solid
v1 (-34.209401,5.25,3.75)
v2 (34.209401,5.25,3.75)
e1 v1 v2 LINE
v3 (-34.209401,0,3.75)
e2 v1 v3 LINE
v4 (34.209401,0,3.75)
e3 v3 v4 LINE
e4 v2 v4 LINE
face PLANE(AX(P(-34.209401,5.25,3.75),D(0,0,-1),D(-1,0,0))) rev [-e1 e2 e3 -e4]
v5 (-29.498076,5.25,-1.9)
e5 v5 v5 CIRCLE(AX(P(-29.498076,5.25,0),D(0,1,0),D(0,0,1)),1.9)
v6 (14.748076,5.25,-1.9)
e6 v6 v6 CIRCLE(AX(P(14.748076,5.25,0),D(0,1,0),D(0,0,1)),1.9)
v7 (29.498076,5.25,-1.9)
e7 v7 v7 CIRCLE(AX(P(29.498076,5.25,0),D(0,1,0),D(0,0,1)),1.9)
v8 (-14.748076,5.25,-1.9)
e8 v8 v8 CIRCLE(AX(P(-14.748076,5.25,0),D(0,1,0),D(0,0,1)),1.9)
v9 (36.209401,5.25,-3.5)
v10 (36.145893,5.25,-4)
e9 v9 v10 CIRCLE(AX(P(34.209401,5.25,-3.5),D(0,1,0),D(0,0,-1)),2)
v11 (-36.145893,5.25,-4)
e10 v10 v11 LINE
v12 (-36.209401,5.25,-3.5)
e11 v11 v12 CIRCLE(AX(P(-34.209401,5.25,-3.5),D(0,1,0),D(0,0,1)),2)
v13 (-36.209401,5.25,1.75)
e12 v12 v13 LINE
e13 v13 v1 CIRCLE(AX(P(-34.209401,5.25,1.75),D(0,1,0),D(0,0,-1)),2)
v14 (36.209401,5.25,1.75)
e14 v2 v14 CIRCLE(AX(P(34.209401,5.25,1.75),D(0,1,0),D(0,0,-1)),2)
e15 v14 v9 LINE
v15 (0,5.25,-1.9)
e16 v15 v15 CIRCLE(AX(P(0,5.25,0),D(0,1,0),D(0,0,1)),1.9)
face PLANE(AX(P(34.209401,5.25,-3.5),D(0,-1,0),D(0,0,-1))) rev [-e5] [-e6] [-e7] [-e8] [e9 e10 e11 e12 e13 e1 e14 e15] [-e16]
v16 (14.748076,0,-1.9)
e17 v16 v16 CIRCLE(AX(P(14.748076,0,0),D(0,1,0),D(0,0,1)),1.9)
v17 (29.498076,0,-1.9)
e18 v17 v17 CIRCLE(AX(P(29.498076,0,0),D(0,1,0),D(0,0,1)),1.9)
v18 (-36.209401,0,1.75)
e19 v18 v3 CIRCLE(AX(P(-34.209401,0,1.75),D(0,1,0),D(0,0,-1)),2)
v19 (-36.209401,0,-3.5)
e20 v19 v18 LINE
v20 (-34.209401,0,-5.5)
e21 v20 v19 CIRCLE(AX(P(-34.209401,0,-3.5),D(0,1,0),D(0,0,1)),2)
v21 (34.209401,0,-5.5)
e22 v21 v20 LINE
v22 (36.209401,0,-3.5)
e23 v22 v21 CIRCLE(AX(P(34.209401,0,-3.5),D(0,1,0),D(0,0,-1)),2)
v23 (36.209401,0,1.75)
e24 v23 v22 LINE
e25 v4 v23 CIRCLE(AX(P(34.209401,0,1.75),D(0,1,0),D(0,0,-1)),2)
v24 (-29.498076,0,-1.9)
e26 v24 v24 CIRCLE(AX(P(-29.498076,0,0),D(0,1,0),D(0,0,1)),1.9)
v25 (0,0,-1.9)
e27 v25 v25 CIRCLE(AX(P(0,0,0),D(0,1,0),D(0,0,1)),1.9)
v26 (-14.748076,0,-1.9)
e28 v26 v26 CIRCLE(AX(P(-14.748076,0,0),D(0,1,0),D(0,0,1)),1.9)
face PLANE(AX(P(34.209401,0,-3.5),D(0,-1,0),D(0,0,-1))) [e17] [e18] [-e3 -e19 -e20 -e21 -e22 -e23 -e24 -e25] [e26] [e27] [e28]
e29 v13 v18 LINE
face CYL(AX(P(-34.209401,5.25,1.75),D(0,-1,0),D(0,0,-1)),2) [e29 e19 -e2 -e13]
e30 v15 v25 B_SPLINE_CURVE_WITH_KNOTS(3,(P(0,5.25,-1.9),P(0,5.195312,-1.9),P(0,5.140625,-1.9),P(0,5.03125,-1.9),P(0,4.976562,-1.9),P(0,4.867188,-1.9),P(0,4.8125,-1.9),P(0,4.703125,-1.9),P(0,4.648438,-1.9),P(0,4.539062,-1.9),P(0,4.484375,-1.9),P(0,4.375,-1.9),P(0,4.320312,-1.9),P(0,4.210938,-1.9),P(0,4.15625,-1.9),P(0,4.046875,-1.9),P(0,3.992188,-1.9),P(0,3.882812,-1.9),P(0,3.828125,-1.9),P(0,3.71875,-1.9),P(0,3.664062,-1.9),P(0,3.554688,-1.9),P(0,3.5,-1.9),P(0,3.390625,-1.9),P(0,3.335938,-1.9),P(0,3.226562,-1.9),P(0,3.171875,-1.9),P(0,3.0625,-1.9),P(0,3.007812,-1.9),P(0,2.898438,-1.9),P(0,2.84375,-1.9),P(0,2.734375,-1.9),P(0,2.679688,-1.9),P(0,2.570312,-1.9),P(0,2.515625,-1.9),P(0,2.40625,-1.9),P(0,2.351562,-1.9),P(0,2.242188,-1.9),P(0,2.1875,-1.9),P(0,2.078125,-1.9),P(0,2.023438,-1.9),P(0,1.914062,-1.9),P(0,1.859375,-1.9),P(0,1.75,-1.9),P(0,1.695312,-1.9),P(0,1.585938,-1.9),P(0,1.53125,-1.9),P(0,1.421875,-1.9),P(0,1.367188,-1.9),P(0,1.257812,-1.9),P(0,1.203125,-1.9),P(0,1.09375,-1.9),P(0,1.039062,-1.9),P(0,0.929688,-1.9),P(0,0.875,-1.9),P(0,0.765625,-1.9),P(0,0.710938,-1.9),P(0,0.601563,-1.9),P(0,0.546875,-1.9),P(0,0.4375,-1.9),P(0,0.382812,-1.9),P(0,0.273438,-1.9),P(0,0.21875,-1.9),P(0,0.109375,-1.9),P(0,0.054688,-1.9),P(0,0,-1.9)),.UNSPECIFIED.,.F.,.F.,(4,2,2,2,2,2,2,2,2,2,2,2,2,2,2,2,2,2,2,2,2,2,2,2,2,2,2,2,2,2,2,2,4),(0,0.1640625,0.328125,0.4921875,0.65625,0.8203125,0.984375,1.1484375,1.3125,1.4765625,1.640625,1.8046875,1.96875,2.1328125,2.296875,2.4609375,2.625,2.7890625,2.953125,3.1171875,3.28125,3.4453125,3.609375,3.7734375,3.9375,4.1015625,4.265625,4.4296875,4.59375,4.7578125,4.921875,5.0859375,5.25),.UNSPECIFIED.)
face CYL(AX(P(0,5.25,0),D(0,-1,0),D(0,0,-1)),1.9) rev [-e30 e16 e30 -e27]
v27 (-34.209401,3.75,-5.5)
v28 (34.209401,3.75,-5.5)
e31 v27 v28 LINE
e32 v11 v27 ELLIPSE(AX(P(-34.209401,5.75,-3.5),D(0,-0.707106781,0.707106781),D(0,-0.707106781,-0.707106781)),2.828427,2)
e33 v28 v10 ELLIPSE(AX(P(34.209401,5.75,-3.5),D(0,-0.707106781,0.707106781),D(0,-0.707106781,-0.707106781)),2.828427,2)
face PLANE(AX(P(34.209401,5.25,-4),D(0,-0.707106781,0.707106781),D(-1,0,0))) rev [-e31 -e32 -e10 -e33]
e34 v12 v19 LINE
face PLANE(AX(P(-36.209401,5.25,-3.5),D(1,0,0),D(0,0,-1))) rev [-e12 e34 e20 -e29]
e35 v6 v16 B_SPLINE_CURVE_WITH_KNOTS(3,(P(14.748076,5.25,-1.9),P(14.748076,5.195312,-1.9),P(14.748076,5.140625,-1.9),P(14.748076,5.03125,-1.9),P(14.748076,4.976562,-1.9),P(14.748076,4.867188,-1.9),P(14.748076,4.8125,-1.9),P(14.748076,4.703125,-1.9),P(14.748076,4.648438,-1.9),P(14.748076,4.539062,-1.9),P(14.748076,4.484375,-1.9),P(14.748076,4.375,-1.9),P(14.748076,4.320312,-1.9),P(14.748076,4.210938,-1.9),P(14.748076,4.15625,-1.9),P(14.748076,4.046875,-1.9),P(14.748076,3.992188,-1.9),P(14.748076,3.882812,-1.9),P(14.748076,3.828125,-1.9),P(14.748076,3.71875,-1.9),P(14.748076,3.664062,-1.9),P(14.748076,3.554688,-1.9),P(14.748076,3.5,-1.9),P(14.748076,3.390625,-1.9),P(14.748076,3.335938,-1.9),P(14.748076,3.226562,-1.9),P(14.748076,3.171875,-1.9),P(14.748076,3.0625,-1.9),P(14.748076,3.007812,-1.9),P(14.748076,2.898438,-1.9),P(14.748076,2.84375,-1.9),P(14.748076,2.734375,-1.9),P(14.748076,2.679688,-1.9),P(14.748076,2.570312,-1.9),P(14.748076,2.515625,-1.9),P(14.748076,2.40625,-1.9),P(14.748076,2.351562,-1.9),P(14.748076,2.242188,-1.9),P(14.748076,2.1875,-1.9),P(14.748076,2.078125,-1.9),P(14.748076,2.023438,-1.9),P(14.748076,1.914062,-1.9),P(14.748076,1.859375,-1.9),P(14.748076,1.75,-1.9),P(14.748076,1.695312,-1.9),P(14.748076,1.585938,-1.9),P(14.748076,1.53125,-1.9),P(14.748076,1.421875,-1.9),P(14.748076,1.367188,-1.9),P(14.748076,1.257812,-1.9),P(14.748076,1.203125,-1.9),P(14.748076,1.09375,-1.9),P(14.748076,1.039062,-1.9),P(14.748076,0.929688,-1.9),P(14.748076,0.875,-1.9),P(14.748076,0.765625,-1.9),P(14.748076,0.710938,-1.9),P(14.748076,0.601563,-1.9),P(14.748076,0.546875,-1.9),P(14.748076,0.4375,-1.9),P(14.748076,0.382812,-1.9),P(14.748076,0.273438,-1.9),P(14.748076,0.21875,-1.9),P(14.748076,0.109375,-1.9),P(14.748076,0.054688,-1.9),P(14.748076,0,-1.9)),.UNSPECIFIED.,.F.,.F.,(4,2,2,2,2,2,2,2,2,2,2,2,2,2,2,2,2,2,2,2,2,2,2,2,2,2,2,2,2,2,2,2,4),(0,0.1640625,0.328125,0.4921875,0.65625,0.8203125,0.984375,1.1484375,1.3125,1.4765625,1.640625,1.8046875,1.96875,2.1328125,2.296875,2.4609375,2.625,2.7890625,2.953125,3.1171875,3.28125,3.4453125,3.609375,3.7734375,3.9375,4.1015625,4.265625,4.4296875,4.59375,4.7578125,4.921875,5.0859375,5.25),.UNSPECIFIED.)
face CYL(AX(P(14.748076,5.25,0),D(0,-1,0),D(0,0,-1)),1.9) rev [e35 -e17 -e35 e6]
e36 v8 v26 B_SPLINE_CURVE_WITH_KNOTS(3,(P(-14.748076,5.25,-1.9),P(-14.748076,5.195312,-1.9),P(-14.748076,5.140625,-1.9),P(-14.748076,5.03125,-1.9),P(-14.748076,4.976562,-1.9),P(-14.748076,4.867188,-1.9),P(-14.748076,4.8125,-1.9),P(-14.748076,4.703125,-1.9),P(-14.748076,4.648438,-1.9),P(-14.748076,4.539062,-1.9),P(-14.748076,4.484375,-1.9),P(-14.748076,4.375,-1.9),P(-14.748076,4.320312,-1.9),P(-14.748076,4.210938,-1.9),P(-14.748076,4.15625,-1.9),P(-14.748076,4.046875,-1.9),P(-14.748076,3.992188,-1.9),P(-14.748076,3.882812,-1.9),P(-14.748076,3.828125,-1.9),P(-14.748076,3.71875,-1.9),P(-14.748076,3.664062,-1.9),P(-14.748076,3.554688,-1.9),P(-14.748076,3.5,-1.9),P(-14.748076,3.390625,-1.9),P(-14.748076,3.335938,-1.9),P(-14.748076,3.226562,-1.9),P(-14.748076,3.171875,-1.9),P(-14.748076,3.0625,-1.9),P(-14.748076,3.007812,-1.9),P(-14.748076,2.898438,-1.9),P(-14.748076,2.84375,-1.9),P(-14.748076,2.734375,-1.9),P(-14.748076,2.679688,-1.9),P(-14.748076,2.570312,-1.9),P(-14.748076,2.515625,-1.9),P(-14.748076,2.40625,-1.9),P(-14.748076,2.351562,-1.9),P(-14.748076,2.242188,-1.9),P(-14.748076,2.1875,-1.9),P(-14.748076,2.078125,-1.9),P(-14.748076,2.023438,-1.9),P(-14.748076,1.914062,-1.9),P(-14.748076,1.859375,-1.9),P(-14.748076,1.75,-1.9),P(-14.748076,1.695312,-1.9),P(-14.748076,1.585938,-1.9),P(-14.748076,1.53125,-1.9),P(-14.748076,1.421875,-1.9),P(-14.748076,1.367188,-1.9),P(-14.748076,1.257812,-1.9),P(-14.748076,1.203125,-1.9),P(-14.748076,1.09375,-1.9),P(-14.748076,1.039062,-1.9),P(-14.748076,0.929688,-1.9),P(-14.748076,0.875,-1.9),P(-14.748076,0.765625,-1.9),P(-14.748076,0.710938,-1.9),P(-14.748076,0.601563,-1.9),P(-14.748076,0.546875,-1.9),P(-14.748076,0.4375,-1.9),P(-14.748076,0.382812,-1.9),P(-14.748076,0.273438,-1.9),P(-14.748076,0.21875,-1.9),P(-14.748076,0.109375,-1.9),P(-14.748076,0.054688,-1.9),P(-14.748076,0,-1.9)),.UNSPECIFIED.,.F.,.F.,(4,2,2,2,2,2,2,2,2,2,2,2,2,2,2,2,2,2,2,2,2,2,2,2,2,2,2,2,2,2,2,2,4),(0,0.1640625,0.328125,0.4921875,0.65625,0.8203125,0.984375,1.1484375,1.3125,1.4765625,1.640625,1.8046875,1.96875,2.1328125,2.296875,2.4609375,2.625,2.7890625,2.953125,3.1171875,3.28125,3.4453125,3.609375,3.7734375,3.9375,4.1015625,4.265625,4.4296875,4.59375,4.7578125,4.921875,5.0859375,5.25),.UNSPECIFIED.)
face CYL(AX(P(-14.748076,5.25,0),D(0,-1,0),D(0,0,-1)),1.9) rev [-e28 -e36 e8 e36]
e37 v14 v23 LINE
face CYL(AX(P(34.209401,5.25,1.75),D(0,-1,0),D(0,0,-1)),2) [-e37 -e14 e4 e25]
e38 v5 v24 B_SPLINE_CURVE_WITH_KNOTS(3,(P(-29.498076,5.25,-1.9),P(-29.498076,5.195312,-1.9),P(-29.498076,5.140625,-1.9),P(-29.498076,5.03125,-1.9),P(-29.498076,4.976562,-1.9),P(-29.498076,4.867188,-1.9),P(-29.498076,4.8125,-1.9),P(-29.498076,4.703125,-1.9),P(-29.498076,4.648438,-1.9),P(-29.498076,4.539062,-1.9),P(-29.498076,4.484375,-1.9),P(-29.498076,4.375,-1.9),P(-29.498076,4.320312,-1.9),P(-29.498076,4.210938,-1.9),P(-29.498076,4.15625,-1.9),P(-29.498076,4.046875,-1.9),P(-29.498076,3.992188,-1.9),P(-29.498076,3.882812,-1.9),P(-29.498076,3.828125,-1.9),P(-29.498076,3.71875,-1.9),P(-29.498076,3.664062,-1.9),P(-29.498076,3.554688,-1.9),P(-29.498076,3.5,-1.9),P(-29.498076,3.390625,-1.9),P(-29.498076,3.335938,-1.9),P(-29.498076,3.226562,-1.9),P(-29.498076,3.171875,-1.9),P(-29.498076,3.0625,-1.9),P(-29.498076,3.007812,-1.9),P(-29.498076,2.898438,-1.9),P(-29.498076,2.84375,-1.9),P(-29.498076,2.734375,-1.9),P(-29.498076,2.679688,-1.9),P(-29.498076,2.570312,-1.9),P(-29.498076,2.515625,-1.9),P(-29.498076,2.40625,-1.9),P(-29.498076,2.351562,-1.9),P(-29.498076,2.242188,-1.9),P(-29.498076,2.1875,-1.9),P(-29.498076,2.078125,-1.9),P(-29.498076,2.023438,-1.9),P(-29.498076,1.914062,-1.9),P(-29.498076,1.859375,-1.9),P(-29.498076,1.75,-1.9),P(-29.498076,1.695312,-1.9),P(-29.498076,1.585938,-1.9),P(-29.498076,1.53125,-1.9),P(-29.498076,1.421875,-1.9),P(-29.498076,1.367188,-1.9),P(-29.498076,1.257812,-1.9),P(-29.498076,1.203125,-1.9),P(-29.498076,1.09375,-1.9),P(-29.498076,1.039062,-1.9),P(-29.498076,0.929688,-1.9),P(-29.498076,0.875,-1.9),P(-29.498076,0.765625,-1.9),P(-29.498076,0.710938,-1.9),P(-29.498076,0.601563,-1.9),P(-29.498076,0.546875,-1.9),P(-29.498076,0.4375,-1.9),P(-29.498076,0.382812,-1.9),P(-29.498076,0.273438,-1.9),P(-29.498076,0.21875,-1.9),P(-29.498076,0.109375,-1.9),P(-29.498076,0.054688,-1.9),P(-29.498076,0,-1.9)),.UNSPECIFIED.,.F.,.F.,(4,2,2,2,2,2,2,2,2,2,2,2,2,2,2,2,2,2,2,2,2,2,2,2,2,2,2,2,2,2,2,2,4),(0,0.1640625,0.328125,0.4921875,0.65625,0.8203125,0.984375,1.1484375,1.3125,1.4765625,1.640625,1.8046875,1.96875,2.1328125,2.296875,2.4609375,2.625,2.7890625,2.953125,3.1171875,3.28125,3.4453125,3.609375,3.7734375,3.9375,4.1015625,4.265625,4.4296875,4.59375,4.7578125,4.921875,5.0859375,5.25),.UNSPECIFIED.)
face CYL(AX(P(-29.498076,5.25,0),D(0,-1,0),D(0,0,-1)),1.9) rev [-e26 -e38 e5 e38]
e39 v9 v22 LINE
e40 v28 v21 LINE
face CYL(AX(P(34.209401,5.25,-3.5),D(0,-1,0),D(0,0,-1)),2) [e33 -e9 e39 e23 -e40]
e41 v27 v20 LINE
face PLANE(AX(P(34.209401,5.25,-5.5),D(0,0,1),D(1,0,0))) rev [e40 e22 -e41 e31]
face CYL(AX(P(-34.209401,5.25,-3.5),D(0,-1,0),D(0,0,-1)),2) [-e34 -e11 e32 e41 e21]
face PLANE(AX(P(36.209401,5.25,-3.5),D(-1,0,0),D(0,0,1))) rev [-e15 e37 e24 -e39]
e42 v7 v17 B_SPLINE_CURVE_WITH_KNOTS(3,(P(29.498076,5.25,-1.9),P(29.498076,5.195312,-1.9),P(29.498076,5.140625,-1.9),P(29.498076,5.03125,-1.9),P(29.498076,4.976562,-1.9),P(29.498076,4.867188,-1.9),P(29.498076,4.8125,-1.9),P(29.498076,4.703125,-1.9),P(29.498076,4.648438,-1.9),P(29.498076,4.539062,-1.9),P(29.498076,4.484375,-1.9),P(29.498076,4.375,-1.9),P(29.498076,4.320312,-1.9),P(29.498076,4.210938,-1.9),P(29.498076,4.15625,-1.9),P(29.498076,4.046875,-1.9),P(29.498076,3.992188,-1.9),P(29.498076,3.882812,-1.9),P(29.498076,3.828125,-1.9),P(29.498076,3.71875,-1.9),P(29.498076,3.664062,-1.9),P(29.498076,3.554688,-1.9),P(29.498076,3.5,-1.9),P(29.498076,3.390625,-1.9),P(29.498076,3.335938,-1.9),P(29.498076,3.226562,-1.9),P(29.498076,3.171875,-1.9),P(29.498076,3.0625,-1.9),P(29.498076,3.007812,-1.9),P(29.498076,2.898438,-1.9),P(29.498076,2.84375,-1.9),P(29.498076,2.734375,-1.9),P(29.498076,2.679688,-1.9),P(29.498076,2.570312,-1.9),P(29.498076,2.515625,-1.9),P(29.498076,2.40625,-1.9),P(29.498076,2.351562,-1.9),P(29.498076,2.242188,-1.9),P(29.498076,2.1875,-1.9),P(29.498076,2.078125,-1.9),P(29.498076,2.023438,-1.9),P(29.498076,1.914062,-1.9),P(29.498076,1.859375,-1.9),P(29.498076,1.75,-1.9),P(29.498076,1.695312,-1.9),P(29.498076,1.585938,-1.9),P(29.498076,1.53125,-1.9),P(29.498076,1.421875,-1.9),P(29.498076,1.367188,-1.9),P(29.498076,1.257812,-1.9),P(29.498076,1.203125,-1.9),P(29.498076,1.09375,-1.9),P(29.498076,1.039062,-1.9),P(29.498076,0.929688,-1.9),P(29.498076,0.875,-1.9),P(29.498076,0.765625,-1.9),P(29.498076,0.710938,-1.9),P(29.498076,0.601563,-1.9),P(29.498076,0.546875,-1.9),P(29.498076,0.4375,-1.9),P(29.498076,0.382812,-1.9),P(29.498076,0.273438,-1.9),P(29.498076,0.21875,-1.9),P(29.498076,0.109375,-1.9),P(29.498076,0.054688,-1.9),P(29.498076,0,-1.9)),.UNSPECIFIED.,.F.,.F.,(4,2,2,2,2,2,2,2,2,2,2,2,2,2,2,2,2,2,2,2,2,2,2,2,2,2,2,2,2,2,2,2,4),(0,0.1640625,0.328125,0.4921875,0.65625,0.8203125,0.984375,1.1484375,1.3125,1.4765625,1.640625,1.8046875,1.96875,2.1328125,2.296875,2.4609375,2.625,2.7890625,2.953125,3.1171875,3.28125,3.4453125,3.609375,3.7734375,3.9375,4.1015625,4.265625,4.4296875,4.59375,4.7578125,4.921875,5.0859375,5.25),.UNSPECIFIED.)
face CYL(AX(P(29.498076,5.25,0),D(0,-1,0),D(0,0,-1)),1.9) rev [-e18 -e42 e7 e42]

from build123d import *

# Parameters (mm, degrees)
CROQUIS1_R              = 1.9
SALIENTE_EXTRUIR1_DEPTH = 5.25
CHAFL_N1_SIZE           = 1.5


with BuildPart() as part:
    # Croquis1 → Saliente-Extruir1 (new body)
    with BuildSketch(Plane(origin=(0, 0, 0), x_dir=(1, 0, 0), z_dir=(0, 1, 0))):
        with BuildLine():
            Line((34.209401077, 5.5), (-34.209401077, 5.5))
            ThreePointArc((-34.209401077, 5.5), (-35.623614639, 4.914213562), (-36.209401077, 3.5))
            Line((-36.209401077, 3.5), (-36.209401077, -1.75))
            ThreePointArc((-36.209401077, -1.75), (-35.623614639, -3.164213562), (-34.209401077, -3.75))
            Line((-34.209401077, -3.75), (34.209401077, -3.75))
            ThreePointArc((34.209401077, -3.75), (35.623614639, -3.164213562), (36.209401077, -1.75))
            Line((36.209401077, -1.75), (36.209401077, 3.5))
            ThreePointArc((36.209401077, 3.5), (35.623614639, 4.914213562), (34.209401077, 5.5))
        make_face()
        with Locations(Location((29.498076211, 0, 0), (0, 0, 90))):
            Circle(CROQUIS1_R, mode=Mode.SUBTRACT)
        with Locations(Location((14.748076211, 0, 0), (0, 0, 90))):
            Circle(CROQUIS1_R, mode=Mode.SUBTRACT)
        with Locations(Location((0, 0, 0), (0, 0, 90))):
            Circle(CROQUIS1_R, mode=Mode.SUBTRACT)
        with Locations(Location((-14.748076211, 0, 0), (0, 0, 90))):
            Circle(CROQUIS1_R, mode=Mode.SUBTRACT)
        with Locations(Location((-29.498076211, 0, 0), (0, 0, 90))):
            Circle(CROQUIS1_R, mode=Mode.SUBTRACT)
    extrude(amount=SALIENTE_EXTRUIR1_DEPTH)

    # Chaflán1
    # the kernel refuses this chamfer: 1.5 mm, written as the material it takes off along each edge
    with BuildSketch(Plane(origin=(38.066925559, 5.25, -5.5), x_dir=(0, -0.9996219169112969, -0.027495876610586202), z_dir=(-1, 0, 0))) as chafl_n1_piece_1:
        Polygon((CHAFL_N1_SIZE * 0.999621916911, CHAFL_N1_SIZE * 0.0274958766106), (-CHAFL_N1_SIZE * 0.0274958766106, CHAFL_N1_SIZE * 0.999621916911), (0, 0), align=None)
    extrude(amount=76.133851117, mode=Mode.SUBTRACT)


solid = part.part
